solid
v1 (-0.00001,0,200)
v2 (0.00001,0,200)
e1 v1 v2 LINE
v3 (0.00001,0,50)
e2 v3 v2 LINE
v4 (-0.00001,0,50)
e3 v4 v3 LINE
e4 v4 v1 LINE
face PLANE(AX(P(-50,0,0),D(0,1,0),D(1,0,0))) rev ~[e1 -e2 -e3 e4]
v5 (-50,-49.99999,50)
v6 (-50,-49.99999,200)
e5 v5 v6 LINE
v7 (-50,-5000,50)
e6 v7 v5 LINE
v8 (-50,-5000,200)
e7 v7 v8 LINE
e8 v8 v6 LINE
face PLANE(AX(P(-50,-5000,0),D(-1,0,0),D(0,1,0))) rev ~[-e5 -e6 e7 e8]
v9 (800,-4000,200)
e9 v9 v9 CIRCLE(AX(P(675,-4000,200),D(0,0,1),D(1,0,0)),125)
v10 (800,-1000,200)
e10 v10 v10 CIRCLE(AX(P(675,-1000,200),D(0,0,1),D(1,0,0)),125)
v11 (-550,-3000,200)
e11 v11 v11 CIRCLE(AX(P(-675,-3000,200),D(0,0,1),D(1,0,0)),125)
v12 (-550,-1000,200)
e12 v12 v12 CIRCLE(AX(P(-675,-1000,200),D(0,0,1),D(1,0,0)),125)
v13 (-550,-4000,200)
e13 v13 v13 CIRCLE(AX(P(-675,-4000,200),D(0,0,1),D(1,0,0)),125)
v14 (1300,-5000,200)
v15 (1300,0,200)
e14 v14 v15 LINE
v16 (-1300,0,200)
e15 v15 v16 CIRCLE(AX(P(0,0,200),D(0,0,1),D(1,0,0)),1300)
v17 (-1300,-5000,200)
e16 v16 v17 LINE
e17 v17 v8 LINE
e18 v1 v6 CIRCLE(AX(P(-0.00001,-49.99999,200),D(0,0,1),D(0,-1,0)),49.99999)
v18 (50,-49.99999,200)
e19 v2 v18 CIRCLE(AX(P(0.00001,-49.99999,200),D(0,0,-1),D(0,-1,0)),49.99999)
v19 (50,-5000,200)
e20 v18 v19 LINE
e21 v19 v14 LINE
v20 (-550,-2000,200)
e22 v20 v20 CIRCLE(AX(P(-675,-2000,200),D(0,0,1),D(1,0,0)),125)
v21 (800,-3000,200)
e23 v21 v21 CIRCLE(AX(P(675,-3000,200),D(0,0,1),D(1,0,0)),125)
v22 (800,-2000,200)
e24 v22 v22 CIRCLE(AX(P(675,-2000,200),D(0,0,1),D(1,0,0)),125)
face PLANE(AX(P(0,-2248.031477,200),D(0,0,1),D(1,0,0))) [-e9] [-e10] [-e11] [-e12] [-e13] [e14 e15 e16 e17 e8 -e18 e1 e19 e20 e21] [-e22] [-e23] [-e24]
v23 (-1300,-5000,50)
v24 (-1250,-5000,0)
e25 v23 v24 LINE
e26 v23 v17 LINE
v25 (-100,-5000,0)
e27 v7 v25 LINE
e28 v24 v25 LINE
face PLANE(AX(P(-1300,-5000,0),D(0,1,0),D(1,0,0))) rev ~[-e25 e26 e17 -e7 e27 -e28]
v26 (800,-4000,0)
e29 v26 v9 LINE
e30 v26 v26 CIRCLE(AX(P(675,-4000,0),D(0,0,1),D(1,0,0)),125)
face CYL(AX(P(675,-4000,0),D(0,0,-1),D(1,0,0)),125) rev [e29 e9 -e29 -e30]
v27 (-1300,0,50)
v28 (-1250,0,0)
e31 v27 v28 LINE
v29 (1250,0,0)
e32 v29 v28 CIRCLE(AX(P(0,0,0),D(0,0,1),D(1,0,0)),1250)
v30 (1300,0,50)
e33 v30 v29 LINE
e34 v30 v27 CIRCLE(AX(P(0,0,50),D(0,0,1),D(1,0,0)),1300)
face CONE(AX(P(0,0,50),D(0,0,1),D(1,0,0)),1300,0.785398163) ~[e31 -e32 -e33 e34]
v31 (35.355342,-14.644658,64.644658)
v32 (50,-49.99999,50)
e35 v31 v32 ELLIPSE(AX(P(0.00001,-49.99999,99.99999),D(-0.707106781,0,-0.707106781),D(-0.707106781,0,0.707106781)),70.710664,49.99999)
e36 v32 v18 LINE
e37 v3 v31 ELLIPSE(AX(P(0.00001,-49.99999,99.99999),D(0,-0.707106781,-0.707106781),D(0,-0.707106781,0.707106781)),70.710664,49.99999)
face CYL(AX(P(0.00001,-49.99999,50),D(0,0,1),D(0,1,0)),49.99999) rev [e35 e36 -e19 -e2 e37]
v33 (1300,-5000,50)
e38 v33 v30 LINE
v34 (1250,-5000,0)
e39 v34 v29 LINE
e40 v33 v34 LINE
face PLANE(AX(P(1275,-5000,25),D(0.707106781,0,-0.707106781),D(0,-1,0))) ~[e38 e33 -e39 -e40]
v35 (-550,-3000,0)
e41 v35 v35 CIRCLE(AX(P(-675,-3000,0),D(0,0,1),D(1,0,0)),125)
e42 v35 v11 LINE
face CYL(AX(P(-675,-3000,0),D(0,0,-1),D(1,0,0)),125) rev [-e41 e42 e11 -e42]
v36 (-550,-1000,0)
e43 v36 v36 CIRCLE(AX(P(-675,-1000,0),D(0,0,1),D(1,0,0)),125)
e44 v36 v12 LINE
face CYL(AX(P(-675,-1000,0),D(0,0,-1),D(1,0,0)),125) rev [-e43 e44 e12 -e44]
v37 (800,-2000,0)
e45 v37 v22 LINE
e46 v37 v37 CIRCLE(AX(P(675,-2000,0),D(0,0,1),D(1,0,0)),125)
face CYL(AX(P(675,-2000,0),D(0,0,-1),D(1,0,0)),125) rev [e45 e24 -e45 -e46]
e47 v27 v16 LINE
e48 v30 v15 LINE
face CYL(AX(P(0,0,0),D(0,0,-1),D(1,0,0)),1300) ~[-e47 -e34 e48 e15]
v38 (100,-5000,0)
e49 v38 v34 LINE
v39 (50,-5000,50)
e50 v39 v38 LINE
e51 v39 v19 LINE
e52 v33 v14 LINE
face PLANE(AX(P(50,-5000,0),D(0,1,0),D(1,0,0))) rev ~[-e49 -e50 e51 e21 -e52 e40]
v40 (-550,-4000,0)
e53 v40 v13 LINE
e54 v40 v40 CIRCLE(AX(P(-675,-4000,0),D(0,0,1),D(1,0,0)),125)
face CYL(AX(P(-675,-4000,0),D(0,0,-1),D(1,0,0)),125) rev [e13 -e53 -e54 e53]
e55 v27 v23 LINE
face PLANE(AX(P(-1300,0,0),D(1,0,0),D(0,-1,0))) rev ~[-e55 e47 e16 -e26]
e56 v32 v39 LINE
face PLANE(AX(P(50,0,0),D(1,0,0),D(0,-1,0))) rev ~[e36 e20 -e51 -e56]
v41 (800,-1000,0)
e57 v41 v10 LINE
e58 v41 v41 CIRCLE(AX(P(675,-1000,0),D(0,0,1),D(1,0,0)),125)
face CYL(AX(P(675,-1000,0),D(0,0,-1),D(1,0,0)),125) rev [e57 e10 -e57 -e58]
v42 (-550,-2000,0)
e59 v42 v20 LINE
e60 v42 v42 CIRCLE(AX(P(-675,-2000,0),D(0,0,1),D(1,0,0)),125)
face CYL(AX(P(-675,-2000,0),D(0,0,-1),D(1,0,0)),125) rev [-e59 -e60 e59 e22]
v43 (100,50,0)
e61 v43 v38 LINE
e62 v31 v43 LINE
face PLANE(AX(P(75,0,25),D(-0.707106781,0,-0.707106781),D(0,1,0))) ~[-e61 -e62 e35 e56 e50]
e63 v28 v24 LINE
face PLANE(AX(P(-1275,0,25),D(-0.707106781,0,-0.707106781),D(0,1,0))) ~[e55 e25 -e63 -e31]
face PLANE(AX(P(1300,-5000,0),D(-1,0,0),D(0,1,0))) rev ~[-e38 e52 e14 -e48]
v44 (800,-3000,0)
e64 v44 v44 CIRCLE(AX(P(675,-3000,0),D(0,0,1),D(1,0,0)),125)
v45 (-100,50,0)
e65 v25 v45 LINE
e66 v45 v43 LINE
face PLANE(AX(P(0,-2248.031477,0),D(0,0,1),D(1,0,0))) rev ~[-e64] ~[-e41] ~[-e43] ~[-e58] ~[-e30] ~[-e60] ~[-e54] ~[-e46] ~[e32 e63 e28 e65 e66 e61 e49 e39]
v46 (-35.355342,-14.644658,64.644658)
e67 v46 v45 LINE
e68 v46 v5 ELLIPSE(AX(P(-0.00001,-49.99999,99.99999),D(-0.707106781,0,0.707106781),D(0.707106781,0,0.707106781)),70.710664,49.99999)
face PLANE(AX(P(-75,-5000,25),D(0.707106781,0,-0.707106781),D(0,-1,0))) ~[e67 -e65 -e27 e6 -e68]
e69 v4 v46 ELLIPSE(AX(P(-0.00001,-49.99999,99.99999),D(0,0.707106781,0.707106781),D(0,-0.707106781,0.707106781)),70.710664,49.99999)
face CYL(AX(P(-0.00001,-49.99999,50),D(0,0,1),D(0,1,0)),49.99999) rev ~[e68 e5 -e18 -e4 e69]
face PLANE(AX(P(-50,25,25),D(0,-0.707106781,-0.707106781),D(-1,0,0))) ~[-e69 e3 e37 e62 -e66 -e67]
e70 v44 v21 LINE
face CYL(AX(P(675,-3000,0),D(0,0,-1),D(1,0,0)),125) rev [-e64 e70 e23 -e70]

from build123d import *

# Parameters (mm, degrees)
F0_R     = 125
F1_DEPTH = 200
F2_SIZE  = 50
F3_R     = 49.99999


# Not quite as in the source:
# - a fillet or chamfer is up to 0.001 mm smaller than in the source, because OpenCascade refuses the exact size


with BuildPart() as f1:
    # F0 (on Top) → F1 (new body)
    with BuildSketch(Plane.XY):
        with BuildLine():
            Line((-50, 0), (0, 0))
            Line((0, 0), (50, 0))
            Line((50, 0), (50, -5000))
            Line((50, -5000), (1300, -5000))
            Line((1300, -5000), (1300, 0))
            ThreePointArc((1300, 0), (0, 1300), (-1300, 0))
            Line((-1300, 0), (-1300, -5000))
            Line((-1300, -5000), (-50, -5000))
            Line((-50, -5000), (-50, 0))
        make_face()
        with Locations((-675, -4000)):
            Circle(F0_R, mode=Mode.SUBTRACT)
        with Locations((-675, -3000)):
            Circle(F0_R, mode=Mode.SUBTRACT)
        with Locations((-675, -2000)):
            Circle(F0_R, mode=Mode.SUBTRACT)
        with Locations((675, -4000)):
            Circle(F0_R, mode=Mode.SUBTRACT)
        with Locations((675, -3000)):
            Circle(F0_R, mode=Mode.SUBTRACT)
        with Locations((675, -2000)):
            Circle(F0_R, mode=Mode.SUBTRACT)
        with Locations((-675, -1000)):
            Circle(F0_R, mode=Mode.SUBTRACT)
        with Locations((675, -1000)):
            Circle(F0_R, mode=Mode.SUBTRACT)
    extrude(amount=F1_DEPTH)

    # F2
    f2_edges = [f1.edges().sort_by_distance(p)[0] for p in [
        (1300, -2500, 0),
        (0, 1300, 0),
        (-1300, -2500, 0),
        (50, -2500, 0),
        (-50, -2500, 0),
        (0, 0, 0),
    ]]
    chamfer(f2_edges, length=F2_SIZE)

    # F3 (radius 50 in the source; OpenCascade refuses exactly that, so slightly less here)
    f3_edges = [f1.edges().sort_by_distance(p)[0] for p in [
        (-50, 0, 125),
        (50, 0, 125),
    ]]
    fillet(f3_edges, radius=F3_R)


solid = f1.part
